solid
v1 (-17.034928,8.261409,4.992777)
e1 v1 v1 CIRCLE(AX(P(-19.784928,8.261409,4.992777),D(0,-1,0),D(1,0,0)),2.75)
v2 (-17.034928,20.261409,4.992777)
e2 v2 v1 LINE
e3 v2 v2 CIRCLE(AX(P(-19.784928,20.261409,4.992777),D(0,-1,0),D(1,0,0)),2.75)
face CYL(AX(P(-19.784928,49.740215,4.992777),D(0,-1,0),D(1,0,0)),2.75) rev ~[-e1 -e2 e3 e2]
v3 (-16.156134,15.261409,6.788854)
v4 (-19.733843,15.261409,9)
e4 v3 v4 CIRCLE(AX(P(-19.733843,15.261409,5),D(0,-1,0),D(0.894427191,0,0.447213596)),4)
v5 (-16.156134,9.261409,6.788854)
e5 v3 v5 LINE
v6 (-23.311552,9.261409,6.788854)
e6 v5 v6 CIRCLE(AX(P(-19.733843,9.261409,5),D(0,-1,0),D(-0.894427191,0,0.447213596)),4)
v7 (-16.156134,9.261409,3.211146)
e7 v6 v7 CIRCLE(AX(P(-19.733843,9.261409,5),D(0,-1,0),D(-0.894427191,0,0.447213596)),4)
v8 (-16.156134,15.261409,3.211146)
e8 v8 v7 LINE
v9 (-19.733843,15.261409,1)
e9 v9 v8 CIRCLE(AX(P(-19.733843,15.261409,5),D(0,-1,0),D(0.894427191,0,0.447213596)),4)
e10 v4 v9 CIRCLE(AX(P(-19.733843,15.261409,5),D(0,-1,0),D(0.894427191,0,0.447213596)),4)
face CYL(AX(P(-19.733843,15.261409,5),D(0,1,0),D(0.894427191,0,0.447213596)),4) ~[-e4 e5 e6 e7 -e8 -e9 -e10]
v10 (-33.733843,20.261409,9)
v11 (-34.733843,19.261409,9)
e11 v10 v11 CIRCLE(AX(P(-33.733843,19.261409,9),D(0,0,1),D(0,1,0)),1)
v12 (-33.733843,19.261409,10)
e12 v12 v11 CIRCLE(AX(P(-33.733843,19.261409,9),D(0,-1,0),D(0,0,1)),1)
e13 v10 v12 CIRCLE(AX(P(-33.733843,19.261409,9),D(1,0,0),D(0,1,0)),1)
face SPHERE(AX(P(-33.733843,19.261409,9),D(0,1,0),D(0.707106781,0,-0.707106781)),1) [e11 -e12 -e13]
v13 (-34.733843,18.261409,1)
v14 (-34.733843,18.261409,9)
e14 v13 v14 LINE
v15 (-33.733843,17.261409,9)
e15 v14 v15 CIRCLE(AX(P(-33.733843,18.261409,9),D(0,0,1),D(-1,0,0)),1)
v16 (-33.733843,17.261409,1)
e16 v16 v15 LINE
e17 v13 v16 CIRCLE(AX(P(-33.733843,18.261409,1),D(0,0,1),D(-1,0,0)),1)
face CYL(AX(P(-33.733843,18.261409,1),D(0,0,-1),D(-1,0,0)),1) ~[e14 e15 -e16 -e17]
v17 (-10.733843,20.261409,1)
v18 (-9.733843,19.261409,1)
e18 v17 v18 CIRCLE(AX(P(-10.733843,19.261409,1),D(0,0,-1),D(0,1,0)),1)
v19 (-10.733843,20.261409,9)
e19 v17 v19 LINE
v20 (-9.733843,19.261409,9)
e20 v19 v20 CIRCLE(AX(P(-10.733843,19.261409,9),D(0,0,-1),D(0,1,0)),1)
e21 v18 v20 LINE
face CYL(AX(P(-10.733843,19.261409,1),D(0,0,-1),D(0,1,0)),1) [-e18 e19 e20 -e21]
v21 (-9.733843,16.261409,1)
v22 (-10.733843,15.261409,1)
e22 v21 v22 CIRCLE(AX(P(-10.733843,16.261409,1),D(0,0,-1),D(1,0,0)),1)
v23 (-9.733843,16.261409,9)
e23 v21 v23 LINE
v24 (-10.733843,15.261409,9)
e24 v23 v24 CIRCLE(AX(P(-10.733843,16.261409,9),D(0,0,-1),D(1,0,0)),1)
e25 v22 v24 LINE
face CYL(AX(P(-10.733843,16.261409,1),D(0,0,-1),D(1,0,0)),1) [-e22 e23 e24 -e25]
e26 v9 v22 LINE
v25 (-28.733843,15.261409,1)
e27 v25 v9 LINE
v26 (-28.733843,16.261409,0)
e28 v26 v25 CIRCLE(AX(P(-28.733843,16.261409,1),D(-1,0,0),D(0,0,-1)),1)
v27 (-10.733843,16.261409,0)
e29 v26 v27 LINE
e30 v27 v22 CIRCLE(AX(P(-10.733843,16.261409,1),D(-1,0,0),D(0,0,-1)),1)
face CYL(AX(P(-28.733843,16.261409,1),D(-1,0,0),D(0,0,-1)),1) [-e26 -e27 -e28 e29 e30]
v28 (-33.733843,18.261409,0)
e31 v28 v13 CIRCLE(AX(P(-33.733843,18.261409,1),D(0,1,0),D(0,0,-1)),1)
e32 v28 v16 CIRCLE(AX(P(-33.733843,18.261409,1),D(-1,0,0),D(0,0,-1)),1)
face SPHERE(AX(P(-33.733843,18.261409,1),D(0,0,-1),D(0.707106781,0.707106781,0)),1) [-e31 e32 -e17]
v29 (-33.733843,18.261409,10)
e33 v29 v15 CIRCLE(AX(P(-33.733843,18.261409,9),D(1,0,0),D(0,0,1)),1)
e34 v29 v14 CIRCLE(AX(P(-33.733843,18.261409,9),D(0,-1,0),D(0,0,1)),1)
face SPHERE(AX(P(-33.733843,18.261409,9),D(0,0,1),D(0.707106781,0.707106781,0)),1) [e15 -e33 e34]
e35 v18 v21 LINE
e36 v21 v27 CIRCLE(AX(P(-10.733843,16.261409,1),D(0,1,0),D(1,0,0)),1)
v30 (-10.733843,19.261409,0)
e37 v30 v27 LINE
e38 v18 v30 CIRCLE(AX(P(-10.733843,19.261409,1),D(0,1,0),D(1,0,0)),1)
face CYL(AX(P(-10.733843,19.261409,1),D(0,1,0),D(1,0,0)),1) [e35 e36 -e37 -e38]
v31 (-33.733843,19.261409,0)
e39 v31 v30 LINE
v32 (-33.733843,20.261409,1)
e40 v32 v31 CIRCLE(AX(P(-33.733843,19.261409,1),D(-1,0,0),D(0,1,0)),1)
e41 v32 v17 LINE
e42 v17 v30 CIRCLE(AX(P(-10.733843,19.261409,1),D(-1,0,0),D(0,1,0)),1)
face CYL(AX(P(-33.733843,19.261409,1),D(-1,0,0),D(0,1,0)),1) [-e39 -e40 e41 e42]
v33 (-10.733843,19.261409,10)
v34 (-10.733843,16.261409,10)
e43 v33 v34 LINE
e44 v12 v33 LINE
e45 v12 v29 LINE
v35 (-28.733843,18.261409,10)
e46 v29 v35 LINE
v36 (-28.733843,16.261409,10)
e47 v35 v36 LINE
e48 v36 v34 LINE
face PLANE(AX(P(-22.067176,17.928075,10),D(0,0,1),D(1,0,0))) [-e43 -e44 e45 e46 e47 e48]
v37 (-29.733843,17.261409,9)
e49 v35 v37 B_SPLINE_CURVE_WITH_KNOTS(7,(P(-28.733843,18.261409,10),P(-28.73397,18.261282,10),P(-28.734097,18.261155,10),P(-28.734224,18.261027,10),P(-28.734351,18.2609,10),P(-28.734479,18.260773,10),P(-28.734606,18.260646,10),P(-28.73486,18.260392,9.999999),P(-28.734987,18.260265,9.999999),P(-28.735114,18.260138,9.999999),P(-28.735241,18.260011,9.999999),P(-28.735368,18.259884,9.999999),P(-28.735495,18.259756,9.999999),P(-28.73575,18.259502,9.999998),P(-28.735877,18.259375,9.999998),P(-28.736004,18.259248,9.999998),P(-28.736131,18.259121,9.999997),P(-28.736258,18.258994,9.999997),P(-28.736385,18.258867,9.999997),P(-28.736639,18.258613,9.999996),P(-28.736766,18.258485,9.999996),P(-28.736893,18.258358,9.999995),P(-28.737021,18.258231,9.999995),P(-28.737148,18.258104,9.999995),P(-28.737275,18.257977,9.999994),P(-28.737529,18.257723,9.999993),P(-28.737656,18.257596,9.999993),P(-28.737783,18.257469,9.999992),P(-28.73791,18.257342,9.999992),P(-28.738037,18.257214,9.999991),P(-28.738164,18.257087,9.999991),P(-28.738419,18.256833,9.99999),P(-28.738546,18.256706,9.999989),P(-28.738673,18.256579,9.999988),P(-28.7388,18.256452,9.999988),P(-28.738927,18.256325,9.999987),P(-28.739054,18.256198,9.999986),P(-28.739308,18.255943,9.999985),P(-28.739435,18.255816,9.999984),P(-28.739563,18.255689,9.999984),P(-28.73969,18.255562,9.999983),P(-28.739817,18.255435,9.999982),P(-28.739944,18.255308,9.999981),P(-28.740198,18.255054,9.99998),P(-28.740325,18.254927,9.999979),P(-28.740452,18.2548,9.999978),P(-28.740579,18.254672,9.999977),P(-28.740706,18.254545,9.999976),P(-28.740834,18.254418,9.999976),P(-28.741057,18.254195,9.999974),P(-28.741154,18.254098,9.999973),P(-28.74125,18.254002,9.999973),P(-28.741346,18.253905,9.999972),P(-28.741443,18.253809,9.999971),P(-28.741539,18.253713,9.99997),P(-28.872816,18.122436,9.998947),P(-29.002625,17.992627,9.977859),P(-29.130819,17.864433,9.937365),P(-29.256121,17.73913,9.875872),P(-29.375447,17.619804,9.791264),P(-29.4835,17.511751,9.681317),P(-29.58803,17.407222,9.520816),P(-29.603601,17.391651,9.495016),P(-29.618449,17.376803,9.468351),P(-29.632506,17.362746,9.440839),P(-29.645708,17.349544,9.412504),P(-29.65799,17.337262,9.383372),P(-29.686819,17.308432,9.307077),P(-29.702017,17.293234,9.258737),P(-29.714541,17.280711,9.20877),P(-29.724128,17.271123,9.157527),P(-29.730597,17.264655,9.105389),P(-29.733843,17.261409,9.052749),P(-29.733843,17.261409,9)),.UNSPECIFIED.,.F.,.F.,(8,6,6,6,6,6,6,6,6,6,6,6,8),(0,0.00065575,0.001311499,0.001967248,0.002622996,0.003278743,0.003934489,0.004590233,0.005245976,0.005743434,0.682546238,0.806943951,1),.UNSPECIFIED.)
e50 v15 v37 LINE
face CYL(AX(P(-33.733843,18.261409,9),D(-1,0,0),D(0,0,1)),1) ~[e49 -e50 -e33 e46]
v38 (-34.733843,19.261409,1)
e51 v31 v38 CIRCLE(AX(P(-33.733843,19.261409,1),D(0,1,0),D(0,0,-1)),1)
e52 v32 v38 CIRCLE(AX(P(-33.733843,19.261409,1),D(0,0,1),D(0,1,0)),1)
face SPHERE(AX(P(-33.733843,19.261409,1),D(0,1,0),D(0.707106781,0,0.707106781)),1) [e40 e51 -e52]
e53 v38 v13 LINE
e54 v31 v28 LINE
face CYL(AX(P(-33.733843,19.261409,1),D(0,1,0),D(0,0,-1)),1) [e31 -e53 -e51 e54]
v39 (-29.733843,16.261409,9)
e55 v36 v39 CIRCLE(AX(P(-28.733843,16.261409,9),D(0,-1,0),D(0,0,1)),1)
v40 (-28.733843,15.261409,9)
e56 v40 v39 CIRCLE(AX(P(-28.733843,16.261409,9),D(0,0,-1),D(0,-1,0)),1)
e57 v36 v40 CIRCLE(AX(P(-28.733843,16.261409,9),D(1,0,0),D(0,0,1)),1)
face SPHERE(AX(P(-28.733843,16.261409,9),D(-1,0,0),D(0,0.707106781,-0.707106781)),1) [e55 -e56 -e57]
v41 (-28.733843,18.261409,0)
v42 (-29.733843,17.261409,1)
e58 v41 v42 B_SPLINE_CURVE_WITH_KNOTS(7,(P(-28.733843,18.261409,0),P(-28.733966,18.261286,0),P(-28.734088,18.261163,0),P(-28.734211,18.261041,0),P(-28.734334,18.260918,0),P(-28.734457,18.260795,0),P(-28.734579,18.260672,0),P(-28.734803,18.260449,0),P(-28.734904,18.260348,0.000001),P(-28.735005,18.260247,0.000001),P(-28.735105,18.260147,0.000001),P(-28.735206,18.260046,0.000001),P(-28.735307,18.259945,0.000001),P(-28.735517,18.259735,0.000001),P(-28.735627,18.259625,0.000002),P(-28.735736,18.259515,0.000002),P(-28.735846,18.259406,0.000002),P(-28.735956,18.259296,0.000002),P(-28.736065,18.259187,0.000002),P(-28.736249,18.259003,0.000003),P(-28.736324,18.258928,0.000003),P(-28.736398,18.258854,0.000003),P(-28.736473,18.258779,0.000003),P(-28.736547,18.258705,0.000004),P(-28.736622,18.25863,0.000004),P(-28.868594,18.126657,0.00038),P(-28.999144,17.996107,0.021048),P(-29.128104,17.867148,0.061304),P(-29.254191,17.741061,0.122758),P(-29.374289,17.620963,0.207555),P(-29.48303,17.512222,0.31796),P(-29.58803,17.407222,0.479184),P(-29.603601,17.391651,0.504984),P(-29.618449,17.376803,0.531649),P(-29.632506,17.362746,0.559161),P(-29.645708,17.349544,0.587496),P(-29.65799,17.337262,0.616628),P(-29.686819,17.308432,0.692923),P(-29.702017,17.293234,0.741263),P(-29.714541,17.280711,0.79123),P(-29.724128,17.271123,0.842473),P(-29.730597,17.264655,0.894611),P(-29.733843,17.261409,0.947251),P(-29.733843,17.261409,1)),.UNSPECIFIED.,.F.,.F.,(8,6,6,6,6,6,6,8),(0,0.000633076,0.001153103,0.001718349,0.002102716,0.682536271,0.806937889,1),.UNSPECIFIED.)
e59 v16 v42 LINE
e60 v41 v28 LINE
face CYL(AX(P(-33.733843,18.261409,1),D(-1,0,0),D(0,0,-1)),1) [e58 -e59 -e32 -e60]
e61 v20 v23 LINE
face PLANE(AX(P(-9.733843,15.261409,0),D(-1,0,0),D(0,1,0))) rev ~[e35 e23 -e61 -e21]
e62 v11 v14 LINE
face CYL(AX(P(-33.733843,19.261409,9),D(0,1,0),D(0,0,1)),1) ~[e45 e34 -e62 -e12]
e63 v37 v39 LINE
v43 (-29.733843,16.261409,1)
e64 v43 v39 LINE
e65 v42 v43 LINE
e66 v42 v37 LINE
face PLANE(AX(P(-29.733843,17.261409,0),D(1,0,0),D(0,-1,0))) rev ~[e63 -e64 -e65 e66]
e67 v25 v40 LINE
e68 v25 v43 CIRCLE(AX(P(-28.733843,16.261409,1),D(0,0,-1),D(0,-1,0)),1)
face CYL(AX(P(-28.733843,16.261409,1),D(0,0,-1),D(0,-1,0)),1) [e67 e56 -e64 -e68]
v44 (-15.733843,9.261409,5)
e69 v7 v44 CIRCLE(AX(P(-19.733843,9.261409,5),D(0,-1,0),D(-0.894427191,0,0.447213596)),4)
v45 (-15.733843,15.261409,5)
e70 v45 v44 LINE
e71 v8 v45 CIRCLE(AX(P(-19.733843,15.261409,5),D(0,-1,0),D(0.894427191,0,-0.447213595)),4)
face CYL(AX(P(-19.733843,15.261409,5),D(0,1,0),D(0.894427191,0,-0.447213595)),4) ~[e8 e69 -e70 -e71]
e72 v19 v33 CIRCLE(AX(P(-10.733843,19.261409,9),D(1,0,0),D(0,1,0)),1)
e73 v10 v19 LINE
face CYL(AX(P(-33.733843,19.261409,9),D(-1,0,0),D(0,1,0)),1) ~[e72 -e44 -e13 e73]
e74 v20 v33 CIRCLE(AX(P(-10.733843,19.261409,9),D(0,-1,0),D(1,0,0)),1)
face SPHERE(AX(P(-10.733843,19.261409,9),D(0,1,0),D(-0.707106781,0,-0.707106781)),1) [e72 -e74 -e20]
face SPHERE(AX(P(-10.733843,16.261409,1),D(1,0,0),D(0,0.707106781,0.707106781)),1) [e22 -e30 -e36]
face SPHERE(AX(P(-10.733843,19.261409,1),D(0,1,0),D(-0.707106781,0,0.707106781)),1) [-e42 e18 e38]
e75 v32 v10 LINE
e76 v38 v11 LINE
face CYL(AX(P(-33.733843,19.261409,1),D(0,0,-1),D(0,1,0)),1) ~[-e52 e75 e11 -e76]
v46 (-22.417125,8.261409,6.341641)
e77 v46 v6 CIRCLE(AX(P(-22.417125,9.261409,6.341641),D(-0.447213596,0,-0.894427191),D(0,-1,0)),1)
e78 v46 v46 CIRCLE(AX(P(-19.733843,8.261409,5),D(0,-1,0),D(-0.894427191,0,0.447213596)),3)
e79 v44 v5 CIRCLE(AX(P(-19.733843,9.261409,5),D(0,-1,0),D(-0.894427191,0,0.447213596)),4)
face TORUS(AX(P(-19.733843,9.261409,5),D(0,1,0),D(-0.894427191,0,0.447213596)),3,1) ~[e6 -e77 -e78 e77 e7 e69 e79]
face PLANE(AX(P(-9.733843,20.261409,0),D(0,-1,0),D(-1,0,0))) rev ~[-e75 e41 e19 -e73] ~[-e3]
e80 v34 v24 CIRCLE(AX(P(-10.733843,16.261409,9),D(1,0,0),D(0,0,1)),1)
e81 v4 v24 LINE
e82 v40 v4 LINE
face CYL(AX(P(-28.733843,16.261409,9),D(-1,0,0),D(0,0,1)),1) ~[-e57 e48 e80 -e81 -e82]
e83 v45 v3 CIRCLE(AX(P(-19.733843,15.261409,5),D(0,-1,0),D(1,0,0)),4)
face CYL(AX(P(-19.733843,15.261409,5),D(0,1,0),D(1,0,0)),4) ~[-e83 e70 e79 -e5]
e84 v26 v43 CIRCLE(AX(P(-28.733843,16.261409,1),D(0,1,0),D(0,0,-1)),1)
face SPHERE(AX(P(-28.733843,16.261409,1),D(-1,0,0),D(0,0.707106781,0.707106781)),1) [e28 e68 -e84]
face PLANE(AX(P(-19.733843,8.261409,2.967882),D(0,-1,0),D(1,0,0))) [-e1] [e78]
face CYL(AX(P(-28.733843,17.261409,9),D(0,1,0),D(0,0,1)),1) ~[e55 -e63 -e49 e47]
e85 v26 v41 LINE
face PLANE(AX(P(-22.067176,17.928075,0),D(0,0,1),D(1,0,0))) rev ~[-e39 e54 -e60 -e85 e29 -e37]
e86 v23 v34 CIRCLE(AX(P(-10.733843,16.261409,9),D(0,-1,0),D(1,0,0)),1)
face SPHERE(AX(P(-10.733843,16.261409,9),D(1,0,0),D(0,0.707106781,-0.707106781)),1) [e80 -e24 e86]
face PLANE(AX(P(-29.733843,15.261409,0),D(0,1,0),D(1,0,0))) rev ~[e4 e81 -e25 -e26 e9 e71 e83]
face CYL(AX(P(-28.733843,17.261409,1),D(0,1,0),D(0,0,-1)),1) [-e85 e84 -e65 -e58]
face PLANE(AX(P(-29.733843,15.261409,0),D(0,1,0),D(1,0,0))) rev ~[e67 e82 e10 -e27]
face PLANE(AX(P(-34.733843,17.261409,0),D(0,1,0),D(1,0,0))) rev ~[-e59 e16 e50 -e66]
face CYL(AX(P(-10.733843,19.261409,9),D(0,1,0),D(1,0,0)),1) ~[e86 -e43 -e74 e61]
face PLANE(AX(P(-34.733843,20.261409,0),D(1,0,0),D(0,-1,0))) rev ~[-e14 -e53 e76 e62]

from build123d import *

# Parameters (mm, degrees)
F1_DEPTH     = 10
F3_DEPTH     = 7
F5_D         = 5.5
F6_T1_DEPTH  = 3
F6_T3_DEPTH  = 1
F6_T5_DEPTH  = 8
F6_T7_DEPTH  = 23
F6_T9_DEPTH  = 18
F6_T11_DEPTH = 4
F6_T13_DEPTH = 1
F6_S17_W     = 1
F6_S17_H     = 1
F6_T18_DEPTH = 1
F6_S23_W     = 1
F6_S23_H     = 1
F6_T24_DEPTH = 1
F6_S29_W     = 1
F6_S29_H     = 1
F6_T30_DEPTH = 1
F6_S35_W     = 1
F6_S35_H     = 1
F6_T36_DEPTH = 1
F6_S41_W     = 1
F6_S41_H     = 1
F6_T42_DEPTH = 1
F6_S47_W     = 1
F6_S47_H     = 1
F6_T48_DEPTH = 1
F6_S53_W     = 1
F6_S53_H     = 1
F6_T54_DEPTH = 1
F6_S59_W     = 1
F6_S59_H     = 1
F6_T60_DEPTH = 1
F6_S65_W     = 1
F6_S65_H     = 1
F6_T66_DEPTH = 1
F6_S71_W     = 1
F6_S71_H     = 1
F6_T72_DEPTH = 1
F6_T81_DEPTH = 6.5
F6_T85_DEPTH = 3.5
F6_T92_DEPTH = 6.5
F6_T96_DEPTH = 3.5


# Not quite as in the source:
# - a fillet or chamfer that OpenCascade refuses, or shapes differently, is made with other operations: its cross-section is extruded or revolved along the edge and cut away or added


with BuildPart() as f1:
    # F0 (on Top) → F1 (new body)
    with BuildSketch(Plane.XY):
        Polygon((-9.7338430583, 20.2614087611), (-34.7338430583, 20.2614087611), (-34.7338430583, 17.2614087611), (-29.7338430583, 17.2614087611), (-29.7338430583, 15.2614087611), (-9.7338430583, 15.2614087611), align=None)
    extrude(amount=F1_DEPTH)

    # F2 (on face) → F3 (join)
    with BuildSketch(Plane.XZ.offset(-15.2614087611)):
        with BuildLine():
            Line((-16.1561342943, 3.211145618), (-19.7338430583, 5))
            Line((-19.7338430583, 5), (-23.3115518223, 3.211145618))
            ThreePointArc((-23.3115518223, 3.211145618), (-19.7338430583, 1), (-16.1561342943, 3.211145618))
        make_face()
        with BuildLine():
            Line((-16.1561342943, 6.788854382), (-19.7338430583, 5))
            Line((-19.7338430583, 5), (-16.1561342943, 3.211145618))
            ThreePointArc((-16.1561342943, 3.211145618), (-15.8408471005, 4.0809883178), (-15.7338430583, 5))
            ThreePointArc((-15.7338430583, 5), (-15.8408471005, 5.9190116822), (-16.1561342943, 6.788854382))
        make_face()
        with BuildLine():
            ThreePointArc((-16.1561342943, 6.788854382), (-19.7338430583, 9), (-23.3115518223, 6.788854382))
            Line((-23.3115518223, 6.788854382), (-19.7338430583, 5))
            Line((-19.7338430583, 5), (-16.1561342943, 6.788854382))
        make_face()
        with BuildLine():
            Line((-19.7338430583, 5), (-23.3115518223, 6.788854382))
            ThreePointArc((-23.3115518223, 6.788854382), (-23.7338430583, 5), (-23.3115518223, 3.211145618))
            Line((-23.3115518223, 3.211145618), (-19.7338430583, 5))
        make_face()
    extrude(amount=F3_DEPTH)

    # F5 (through all)
    with Locations(Plane(origin=(0, 20.2614087611, 0), x_dir=(-1, 0, 0), z_dir=(0, 1, 0))):
        with Locations((19.7849275367, 4.9927774844)):
            Hole(F5_D / 2)

    # F6: fillet of radius 1 on 18 edges, made by hand

    # F6_s2 → F6_t1 (cut)
    with BuildSketch(Plane.XZ.offset(-19.2614087611)):
        with BuildLine():
            ThreePointArc((-9.7338430583, 9), (-10.0267362772, 9.7071067812), (-10.7338430583, 10))
            Line((-10.7338430583, 10), (-9.7338430583, 10))
            Line((-9.7338430583, 10), (-9.7338430583, 9))
        make_face()
        with BuildLine():
            ThreePointArc((-9.7338430583, 1), (-10.0267362772, 0.2928932188), (-10.7338430583, 0))
            Line((-10.7338430583, 0), (-9.7338430583, 0))
            Line((-9.7338430583, 0), (-9.7338430583, 1))
        make_face()
    extrude(amount=F6_T1_DEPTH, mode=Mode.SUBTRACT)

    # F6_s4 → F6_t3 (cut)
    with BuildSketch(Plane.XZ.offset(-19.2614087611)):
        with BuildLine():
            ThreePointArc((-33.7338430583, 10), (-34.4409498395, 9.7071067812), (-34.7338430583, 9))
            Line((-34.7338430583, 9), (-34.7338430583, 10))
            Line((-34.7338430583, 10), (-33.7338430583, 10))
        make_face()
        with BuildLine():
            ThreePointArc((-33.7338430583, 0), (-34.4409498395, 0.2928932188), (-34.7338430583, 1))
            Line((-34.7338430583, 1), (-34.7338430583, 0))
            Line((-34.7338430583, 0), (-33.7338430583, 0))
        make_face()
    extrude(amount=F6_T3_DEPTH, mode=Mode.SUBTRACT)

    # F6_s6 → F6_t5 (cut)
    with BuildSketch(Plane.XY.offset(1)):
        with BuildLine():
            ThreePointArc((-33.7338430583, 20.2614087611), (-34.4409498395, 19.9685155423), (-34.7338430583, 19.2614087611))
            Line((-34.7338430583, 19.2614087611), (-34.7338430583, 20.2614087611))
            Line((-34.7338430583, 20.2614087611), (-33.7338430583, 20.2614087611))
        make_face()
        with BuildLine():
            ThreePointArc((-34.7338430583, 18.2614087611), (-34.4409498395, 17.55430198), (-33.7338430583, 17.2614087611))
            Line((-33.7338430583, 17.2614087611), (-34.7338430583, 17.2614087611))
            Line((-34.7338430583, 17.2614087611), (-34.7338430583, 18.2614087611))
        make_face()
        with BuildLine():
            ThreePointArc((-10.7338430583, 20.2614087611), (-10.0267362772, 19.9685155423), (-9.7338430583, 19.2614087611))
            Line((-9.7338430583, 19.2614087611), (-9.7338430583, 20.2614087611))
            Line((-9.7338430583, 20.2614087611), (-10.7338430583, 20.2614087611))
        make_face()
        with BuildLine():
            ThreePointArc((-28.7338430583, 15.2614087611), (-29.4409498395, 15.55430198), (-29.7338430583, 16.2614087611))
            Line((-29.7338430583, 16.2614087611), (-29.7338430583, 15.2614087611))
            Line((-29.7338430583, 15.2614087611), (-28.7338430583, 15.2614087611))
        make_face()
        with BuildLine():
            ThreePointArc((-9.7338430583, 16.2614087611), (-10.0267362772, 15.55430198), (-10.7338430583, 15.2614087611))
            Line((-10.7338430583, 15.2614087611), (-9.7338430583, 15.2614087611))
            Line((-9.7338430583, 15.2614087611), (-9.7338430583, 16.2614087611))
        make_face()
    extrude(amount=F6_T5_DEPTH, mode=Mode.SUBTRACT)

    # F6_s8 → F6_t7 (cut)
    with BuildSketch(Plane.YZ.offset(-33.7338430583)):
        with BuildLine():
            ThreePointArc((20.2614087611, 1), (19.9685155423, 0.2928932188), (19.2614087611, 0))
            Line((19.2614087611, 0), (20.2614087611, 0))
            Line((20.2614087611, 0), (20.2614087611, 1))
        make_face()
        with BuildLine():
            ThreePointArc((20.2614087611, 9), (19.9685155423, 9.7071067812), (19.2614087611, 10))
            Line((19.2614087611, 10), (20.2614087611, 10))
            Line((20.2614087611, 10), (20.2614087611, 9))
        make_face()
    extrude(amount=F6_T7_DEPTH, mode=Mode.SUBTRACT)

    # F6_s10 → F6_t9 (cut)
    with BuildSketch(Plane.YZ.offset(-28.7338430583)):
        with BuildLine():
            ThreePointArc((16.2614087611, 0), (15.55430198, 0.2928932188), (15.2614087611, 1))
            Line((15.2614087611, 1), (15.2614087611, 0))
            Line((15.2614087611, 0), (16.2614087611, 0))
        make_face()
        with BuildLine():
            ThreePointArc((16.2614087611, 10), (15.55430198, 9.7071067812), (15.2614087611, 9))
            Line((15.2614087611, 9), (15.2614087611, 10))
            Line((15.2614087611, 10), (16.2614087611, 10))
        make_face()
    extrude(amount=F6_T9_DEPTH, mode=Mode.SUBTRACT)

    # F6_s12 → F6_t11 (cut)
    with BuildSketch(Plane.YZ.offset(-33.7338430583)):
        with BuildLine():
            ThreePointArc((18.2614087611, 0), (17.55430198, 0.2928932188), (17.2614087611, 1))
            Line((17.2614087611, 1), (17.2614087611, 0))
            Line((17.2614087611, 0), (18.2614087611, 0))
        make_face()
        with BuildLine():
            ThreePointArc((18.2614087611, 10), (17.55430198, 9.7071067812), (17.2614087611, 9))
            Line((17.2614087611, 9), (17.2614087611, 10))
            Line((17.2614087611, 10), (18.2614087611, 10))
        make_face()
    extrude(amount=F6_T11_DEPTH, mode=Mode.SUBTRACT)

    # F6_s14 → F6_t13 (cut)
    with BuildSketch(Plane.XZ.offset(-17.2614087611)):
        with BuildLine():
            ThreePointArc((-28.7338430583, 0), (-29.4409498395, 0.2928932188), (-29.7338430583, 1))
            Line((-29.7338430583, 1), (-29.7338430583, 0))
            Line((-29.7338430583, 0), (-28.7338430583, 0))
        make_face()
        with BuildLine():
            ThreePointArc((-28.7338430583, 10), (-29.4409498395, 9.7071067812), (-29.7338430583, 9))
            Line((-29.7338430583, 9), (-29.7338430583, 10))
            Line((-29.7338430583, 10), (-28.7338430583, 10))
        make_face()
    extrude(amount=F6_T13_DEPTH, mode=Mode.SUBTRACT)


with BuildPart() as f6_tool16:
    # F6_s17 → F6_t18 (new body)
    with BuildSketch(Plane.YZ.offset(-10.7338430583)):
        with Locations((15.7614087611, 9.5)):
            Rectangle(F6_S17_W, F6_S17_H)
    extrude(amount=F6_T18_DEPTH)

    # F6_s19 → F6_t20 (revolve, cut)
    with BuildSketch(Plane(origin=(-10.7338430583, 16.2614087611, 9), x_dir=(0, 0.7071067812, -0.7071067812), z_dir=(0, -0.7071067812, -0.7071067812))):
        with BuildLine():
            ThreePointArc((0, -1), (1, 0), (0, 1))
            Line((0, 1), (0, -1))
        make_face()
    revolve(axis=Axis((-10.7338430583, 16.2614087611, 9), (1, 0, 0)), mode=Mode.SUBTRACT)


with BuildPart() as f1_1:
    add(f1.part)

    # F6_t15: cut F6_tool16
    add(f6_tool16.part, mode=Mode.SUBTRACT)


with BuildPart() as f6_tool22:
    # F6_s23 → F6_t24 (new body)
    with BuildSketch(Plane.XZ.offset(-19.2614087611)):
        with Locations((-10.2338430583, 9.5)):
            Rectangle(F6_S23_W, F6_S23_H)
    extrude(amount=-F6_T24_DEPTH)

    # F6_s25 → F6_t26 (revolve, cut)
    with BuildSketch(Plane(origin=(-10.7338430583, 19.2614087611, 9), x_dir=(-0.7071067812, 0, -0.7071067812), z_dir=(0.7071067812, 0, -0.7071067812))):
        with BuildLine():
            ThreePointArc((0, -1), (1, 0), (0, 1))
            Line((0, 1), (0, -1))
        make_face()
    revolve(axis=Axis((-10.7338430583, 19.2614087611, 9), (0, 1, 0)), mode=Mode.SUBTRACT)


with BuildPart() as f1_2:
    add(f1_1.part)

    # F6_t21: cut F6_tool22
    add(f6_tool22.part, mode=Mode.SUBTRACT)


with BuildPart() as f6_tool28:
    # F6_s29 → F6_t30 (new body)
    with BuildSketch(Plane.YZ.offset(-10.7338430583)):
        with Locations((15.7614087611, 0.5)):
            Rectangle(F6_S29_W, F6_S29_H)
    extrude(amount=F6_T30_DEPTH)

    # F6_s31 → F6_t32 (revolve, cut)
    with BuildSketch(Plane(origin=(-10.7338430583, 16.2614087611, 1), x_dir=(0, 0.7071067812, 0.7071067812), z_dir=(0, 0.7071067812, -0.7071067812))):
        with BuildLine():
            ThreePointArc((0, -1), (1, 0), (0, 1))
            Line((0, 1), (0, -1))
        make_face()
    revolve(axis=Axis((-10.7338430583, 16.2614087611, 1), (1, 0, 0)), mode=Mode.SUBTRACT)


with BuildPart() as f1_3:
    add(f1_2.part)

    # F6_t27: cut F6_tool28
    add(f6_tool28.part, mode=Mode.SUBTRACT)


with BuildPart() as f6_tool34:
    # F6_s35 → F6_t36 (new body)
    with BuildSketch(Plane.XZ.offset(-19.2614087611)):
        with Locations((-10.2338430583, 0.5)):
            Rectangle(F6_S35_W, F6_S35_H)
    extrude(amount=-F6_T36_DEPTH)

    # F6_s37 → F6_t38 (revolve, cut)
    with BuildSketch(Plane(origin=(-10.7338430583, 19.2614087611, 1), x_dir=(-0.7071067812, 0, 0.7071067812), z_dir=(-0.7071067812, 0, -0.7071067812))):
        with BuildLine():
            ThreePointArc((0, -1), (1, 0), (0, 1))
            Line((0, 1), (0, -1))
        make_face()
    revolve(axis=Axis((-10.7338430583, 19.2614087611, 1), (0, 1, 0)), mode=Mode.SUBTRACT)


with BuildPart() as f1_4:
    add(f1_3.part)

    # F6_t33: cut F6_tool34
    add(f6_tool34.part, mode=Mode.SUBTRACT)


with BuildPart() as f6_tool40:
    # F6_s41 → F6_t42 (new body)
    with BuildSketch(Plane.XZ.offset(-19.2614087611)):
        with Locations((-34.2338430583, 9.5)):
            Rectangle(F6_S41_W, F6_S41_H)
    extrude(amount=-F6_T42_DEPTH)

    # F6_s43 → F6_t44 (revolve, cut)
    with BuildSketch(Plane(origin=(-33.7338430583, 19.2614087611, 9), x_dir=(0.7071067812, 0, -0.7071067812), z_dir=(0.7071067812, 0, 0.7071067812))):
        with BuildLine():
            ThreePointArc((0, -1), (1, 0), (0, 1))
            Line((0, 1), (0, -1))
        make_face()
    revolve(axis=Axis((-33.7338430583, 19.2614087611, 9), (0, 1, 0)), mode=Mode.SUBTRACT)


with BuildPart() as f1_5:
    add(f1_4.part)

    # F6_t39: cut F6_tool40
    add(f6_tool40.part, mode=Mode.SUBTRACT)


with BuildPart() as f6_tool46:
    # F6_s47 → F6_t48 (new body)
    with BuildSketch(Plane.XY.offset(9)):
        with Locations((-34.2338430583, 17.7614087611)):
            Rectangle(F6_S47_W, F6_S47_H)
    extrude(amount=F6_T48_DEPTH)

    # F6_s49 → F6_t50 (revolve, cut)
    with BuildSketch(Plane(origin=(-33.7338430583, 18.2614087611, 9), x_dir=(0.7071067812, 0.7071067812, 0), z_dir=(0.7071067812, -0.7071067812, 0))):
        with BuildLine():
            ThreePointArc((0, -1), (1, 0), (0, 1))
            Line((0, 1), (0, -1))
        make_face()
    revolve(axis=Axis((-33.7338430583, 18.2614087611, 9), (0, 0, 1)), mode=Mode.SUBTRACT)


with BuildPart() as f1_6:
    add(f1_5.part)

    # F6_t45: cut F6_tool46
    add(f6_tool46.part, mode=Mode.SUBTRACT)


with BuildPart() as f6_tool52:
    # F6_s53 → F6_t54 (new body)
    with BuildSketch(Plane.XZ.offset(-19.2614087611)):
        with Locations((-34.2338430583, 0.5)):
            Rectangle(F6_S53_W, F6_S53_H)
    extrude(amount=-F6_T54_DEPTH)

    # F6_s55 → F6_t56 (revolve, cut)
    with BuildSketch(Plane(origin=(-33.7338430583, 19.2614087611, 1), x_dir=(0.7071067812, 0, 0.7071067812), z_dir=(-0.7071067812, 0, 0.7071067812))):
        with BuildLine():
            ThreePointArc((0, -1), (1, 0), (0, 1))
            Line((0, 1), (0, -1))
        make_face()
    revolve(axis=Axis((-33.7338430583, 19.2614087611, 1), (0, 1, 0)), mode=Mode.SUBTRACT)


with BuildPart() as f1_7:
    add(f1_6.part)

    # F6_t51: cut F6_tool52
    add(f6_tool52.part, mode=Mode.SUBTRACT)


with BuildPart() as f6_tool58:
    # F6_s59 → F6_t60 (new body)
    with BuildSketch(Plane.XY.offset(1)):
        with Locations((-34.2338430583, 17.7614087611)):
            Rectangle(F6_S59_W, F6_S59_H)
    extrude(amount=-F6_T60_DEPTH)

    # F6_s61 → F6_t62 (revolve, cut)
    with BuildSketch(Plane(origin=(-33.7338430583, 18.2614087611, 1), x_dir=(0.7071067812, 0.7071067812, 0), z_dir=(-0.7071067812, 0.7071067812, 0))):
        with BuildLine():
            ThreePointArc((0, -1), (1, 0), (0, 1))
            Line((0, 1), (0, -1))
        make_face()
    revolve(axis=Axis((-33.7338430583, 18.2614087611, 1), (0, 0, -1)), mode=Mode.SUBTRACT)


with BuildPart() as f1_8:
    add(f1_7.part)

    # F6_t57: cut F6_tool58
    add(f6_tool58.part, mode=Mode.SUBTRACT)


with BuildPart() as f6_tool64:
    # F6_s65 → F6_t66 (new body)
    with BuildSketch(Plane.YZ.offset(-28.7338430583)):
        with Locations((15.7614087611, 0.5)):
            Rectangle(F6_S65_W, F6_S65_H)
    extrude(amount=-F6_T66_DEPTH)

    # F6_s67 → F6_t68 (revolve, cut)
    with BuildSketch(Plane(origin=(-28.7338430583, 16.2614087611, 1), x_dir=(0, 0.7071067812, 0.7071067812), z_dir=(0, -0.7071067812, 0.7071067812))):
        with BuildLine():
            ThreePointArc((0, -1), (1, 0), (0, 1))
            Line((0, 1), (0, -1))
        make_face()
    revolve(axis=Axis((-28.7338430583, 16.2614087611, 1), (-1, 0, 0)), mode=Mode.SUBTRACT)


with BuildPart() as f1_9:
    add(f1_8.part)

    # F6_t63: cut F6_tool64
    add(f6_tool64.part, mode=Mode.SUBTRACT)


with BuildPart() as f6_tool70:
    # F6_s71 → F6_t72 (new body)
    with BuildSketch(Plane.YZ.offset(-28.7338430583)):
        with Locations((15.7614087611, 9.5)):
            Rectangle(F6_S71_W, F6_S71_H)
    extrude(amount=-F6_T72_DEPTH)

    # F6_s73 → F6_t74 (revolve, cut)
    with BuildSketch(Plane(origin=(-28.7338430583, 16.2614087611, 9), x_dir=(0, 0.7071067812, -0.7071067812), z_dir=(0, 0.7071067812, 0.7071067812))):
        with BuildLine():
            ThreePointArc((0, -1), (1, 0), (0, 1))
            Line((0, 1), (0, -1))
        make_face()
    revolve(axis=Axis((-28.7338430583, 16.2614087611, 9), (-1, 0, 0)), mode=Mode.SUBTRACT)


with BuildPart() as f1_10:
    add(f1_9.part)

    # F6_t69: cut F6_tool70
    add(f6_tool70.part, mode=Mode.SUBTRACT)

    # F6_s75 → F6_t76 (revolve, cut)
    with BuildSketch(Plane(origin=(-1.9467686117, 0, -3.8935372233), x_dir=(0, 1, 0), z_dir=(0.4472135955, 0, 0.894427191))):
        with BuildLine():
            ThreePointArc((8.2614087611, 22.8865537918), (8.55430198, 23.593660573), (9.2614087611, 23.8865537918))
            Line((9.2614087611, 23.8865537918), (8.2614087611, 23.8865537918))
            Line((8.2614087611, 23.8865537918), (8.2614087611, 22.8865537918))
        make_face()
    revolve(axis=Axis((-19.7338430583, 8.2614087611, 5), (0, -1, 0)), mode=Mode.SUBTRACT)


with BuildPart() as f6_tool79:
    # F6_s80 → F6_t81 (new body)
    with BuildSketch(Plane.YZ.offset(-33.7338430583)):
        with BuildLine():
            ThreePointArc((18.2614087611, 0), (17.55430198, 0.2928932188), (17.2614087611, 1))
            Line((17.2614087611, 1), (17.2614087611, 0))
            Line((17.2614087611, 0), (18.2614087611, 0))
        make_face()
    extrude(amount=F6_T81_DEPTH)

    split(bisect_by=Plane.YZ.offset(-29.7338430583), keep=Keep.TOP)


with BuildPart() as f6_tool83:
    # F6_s84 → F6_t85 (new body)
    with BuildSketch(Plane.XZ.offset(-19.7614087611)):
        with BuildLine():
            ThreePointArc((-28.7338430583, 0), (-29.4409498395, 0.2928932188), (-29.7338430583, 1))
            Line((-29.7338430583, 1), (-29.7338430583, 0))
            Line((-29.7338430583, 0), (-28.7338430583, 0))
        make_face()
    extrude(amount=F6_T85_DEPTH)

    split(bisect_by=Plane.XZ.offset(-17.2614087611), keep=Keep.BOTTOM)


with BuildPart() as f6_tool79_1:
    add(f6_tool79.part)

    # F6_t87: intersect F6_tool83
    add(f6_tool83.part, mode=Mode.INTERSECT)


with BuildPart() as f1_11:
    add(f1_10.part)

    # F6_t77: cut F6_tool79
    add(f6_tool79_1.part, mode=Mode.SUBTRACT)


with BuildPart() as f6_tool90:
    # F6_s91 → F6_t92 (new body)
    with BuildSketch(Plane.YZ.offset(-33.7338430583)):
        with BuildLine():
            ThreePointArc((18.2614087611, 10), (17.55430198, 9.7071067812), (17.2614087611, 9))
            Line((17.2614087611, 9), (17.2614087611, 10))
            Line((17.2614087611, 10), (18.2614087611, 10))
        make_face()
    extrude(amount=F6_T92_DEPTH)

    split(bisect_by=Plane.YZ.offset(-29.7338430583), keep=Keep.TOP)


with BuildPart() as f6_tool94:
    # F6_s95 → F6_t96 (new body)
    with BuildSketch(Plane.XZ.offset(-19.7614087611)):
        with BuildLine():
            ThreePointArc((-28.7338430583, 10), (-29.4409498395, 9.7071067812), (-29.7338430583, 9))
            Line((-29.7338430583, 9), (-29.7338430583, 10))
            Line((-29.7338430583, 10), (-28.7338430583, 10))
        make_face()
    extrude(amount=F6_T96_DEPTH)

    split(bisect_by=Plane.XZ.offset(-17.2614087611), keep=Keep.BOTTOM)


with BuildPart() as f6_tool90_1:
    add(f6_tool90.part)

    # F6_t98: intersect F6_tool94
    add(f6_tool94.part, mode=Mode.INTERSECT)


with BuildPart() as f1_12:
    add(f1_11.part)

    # F6_t88: cut F6_tool90
    add(f6_tool90_1.part, mode=Mode.SUBTRACT)


solid = f1_12.part
